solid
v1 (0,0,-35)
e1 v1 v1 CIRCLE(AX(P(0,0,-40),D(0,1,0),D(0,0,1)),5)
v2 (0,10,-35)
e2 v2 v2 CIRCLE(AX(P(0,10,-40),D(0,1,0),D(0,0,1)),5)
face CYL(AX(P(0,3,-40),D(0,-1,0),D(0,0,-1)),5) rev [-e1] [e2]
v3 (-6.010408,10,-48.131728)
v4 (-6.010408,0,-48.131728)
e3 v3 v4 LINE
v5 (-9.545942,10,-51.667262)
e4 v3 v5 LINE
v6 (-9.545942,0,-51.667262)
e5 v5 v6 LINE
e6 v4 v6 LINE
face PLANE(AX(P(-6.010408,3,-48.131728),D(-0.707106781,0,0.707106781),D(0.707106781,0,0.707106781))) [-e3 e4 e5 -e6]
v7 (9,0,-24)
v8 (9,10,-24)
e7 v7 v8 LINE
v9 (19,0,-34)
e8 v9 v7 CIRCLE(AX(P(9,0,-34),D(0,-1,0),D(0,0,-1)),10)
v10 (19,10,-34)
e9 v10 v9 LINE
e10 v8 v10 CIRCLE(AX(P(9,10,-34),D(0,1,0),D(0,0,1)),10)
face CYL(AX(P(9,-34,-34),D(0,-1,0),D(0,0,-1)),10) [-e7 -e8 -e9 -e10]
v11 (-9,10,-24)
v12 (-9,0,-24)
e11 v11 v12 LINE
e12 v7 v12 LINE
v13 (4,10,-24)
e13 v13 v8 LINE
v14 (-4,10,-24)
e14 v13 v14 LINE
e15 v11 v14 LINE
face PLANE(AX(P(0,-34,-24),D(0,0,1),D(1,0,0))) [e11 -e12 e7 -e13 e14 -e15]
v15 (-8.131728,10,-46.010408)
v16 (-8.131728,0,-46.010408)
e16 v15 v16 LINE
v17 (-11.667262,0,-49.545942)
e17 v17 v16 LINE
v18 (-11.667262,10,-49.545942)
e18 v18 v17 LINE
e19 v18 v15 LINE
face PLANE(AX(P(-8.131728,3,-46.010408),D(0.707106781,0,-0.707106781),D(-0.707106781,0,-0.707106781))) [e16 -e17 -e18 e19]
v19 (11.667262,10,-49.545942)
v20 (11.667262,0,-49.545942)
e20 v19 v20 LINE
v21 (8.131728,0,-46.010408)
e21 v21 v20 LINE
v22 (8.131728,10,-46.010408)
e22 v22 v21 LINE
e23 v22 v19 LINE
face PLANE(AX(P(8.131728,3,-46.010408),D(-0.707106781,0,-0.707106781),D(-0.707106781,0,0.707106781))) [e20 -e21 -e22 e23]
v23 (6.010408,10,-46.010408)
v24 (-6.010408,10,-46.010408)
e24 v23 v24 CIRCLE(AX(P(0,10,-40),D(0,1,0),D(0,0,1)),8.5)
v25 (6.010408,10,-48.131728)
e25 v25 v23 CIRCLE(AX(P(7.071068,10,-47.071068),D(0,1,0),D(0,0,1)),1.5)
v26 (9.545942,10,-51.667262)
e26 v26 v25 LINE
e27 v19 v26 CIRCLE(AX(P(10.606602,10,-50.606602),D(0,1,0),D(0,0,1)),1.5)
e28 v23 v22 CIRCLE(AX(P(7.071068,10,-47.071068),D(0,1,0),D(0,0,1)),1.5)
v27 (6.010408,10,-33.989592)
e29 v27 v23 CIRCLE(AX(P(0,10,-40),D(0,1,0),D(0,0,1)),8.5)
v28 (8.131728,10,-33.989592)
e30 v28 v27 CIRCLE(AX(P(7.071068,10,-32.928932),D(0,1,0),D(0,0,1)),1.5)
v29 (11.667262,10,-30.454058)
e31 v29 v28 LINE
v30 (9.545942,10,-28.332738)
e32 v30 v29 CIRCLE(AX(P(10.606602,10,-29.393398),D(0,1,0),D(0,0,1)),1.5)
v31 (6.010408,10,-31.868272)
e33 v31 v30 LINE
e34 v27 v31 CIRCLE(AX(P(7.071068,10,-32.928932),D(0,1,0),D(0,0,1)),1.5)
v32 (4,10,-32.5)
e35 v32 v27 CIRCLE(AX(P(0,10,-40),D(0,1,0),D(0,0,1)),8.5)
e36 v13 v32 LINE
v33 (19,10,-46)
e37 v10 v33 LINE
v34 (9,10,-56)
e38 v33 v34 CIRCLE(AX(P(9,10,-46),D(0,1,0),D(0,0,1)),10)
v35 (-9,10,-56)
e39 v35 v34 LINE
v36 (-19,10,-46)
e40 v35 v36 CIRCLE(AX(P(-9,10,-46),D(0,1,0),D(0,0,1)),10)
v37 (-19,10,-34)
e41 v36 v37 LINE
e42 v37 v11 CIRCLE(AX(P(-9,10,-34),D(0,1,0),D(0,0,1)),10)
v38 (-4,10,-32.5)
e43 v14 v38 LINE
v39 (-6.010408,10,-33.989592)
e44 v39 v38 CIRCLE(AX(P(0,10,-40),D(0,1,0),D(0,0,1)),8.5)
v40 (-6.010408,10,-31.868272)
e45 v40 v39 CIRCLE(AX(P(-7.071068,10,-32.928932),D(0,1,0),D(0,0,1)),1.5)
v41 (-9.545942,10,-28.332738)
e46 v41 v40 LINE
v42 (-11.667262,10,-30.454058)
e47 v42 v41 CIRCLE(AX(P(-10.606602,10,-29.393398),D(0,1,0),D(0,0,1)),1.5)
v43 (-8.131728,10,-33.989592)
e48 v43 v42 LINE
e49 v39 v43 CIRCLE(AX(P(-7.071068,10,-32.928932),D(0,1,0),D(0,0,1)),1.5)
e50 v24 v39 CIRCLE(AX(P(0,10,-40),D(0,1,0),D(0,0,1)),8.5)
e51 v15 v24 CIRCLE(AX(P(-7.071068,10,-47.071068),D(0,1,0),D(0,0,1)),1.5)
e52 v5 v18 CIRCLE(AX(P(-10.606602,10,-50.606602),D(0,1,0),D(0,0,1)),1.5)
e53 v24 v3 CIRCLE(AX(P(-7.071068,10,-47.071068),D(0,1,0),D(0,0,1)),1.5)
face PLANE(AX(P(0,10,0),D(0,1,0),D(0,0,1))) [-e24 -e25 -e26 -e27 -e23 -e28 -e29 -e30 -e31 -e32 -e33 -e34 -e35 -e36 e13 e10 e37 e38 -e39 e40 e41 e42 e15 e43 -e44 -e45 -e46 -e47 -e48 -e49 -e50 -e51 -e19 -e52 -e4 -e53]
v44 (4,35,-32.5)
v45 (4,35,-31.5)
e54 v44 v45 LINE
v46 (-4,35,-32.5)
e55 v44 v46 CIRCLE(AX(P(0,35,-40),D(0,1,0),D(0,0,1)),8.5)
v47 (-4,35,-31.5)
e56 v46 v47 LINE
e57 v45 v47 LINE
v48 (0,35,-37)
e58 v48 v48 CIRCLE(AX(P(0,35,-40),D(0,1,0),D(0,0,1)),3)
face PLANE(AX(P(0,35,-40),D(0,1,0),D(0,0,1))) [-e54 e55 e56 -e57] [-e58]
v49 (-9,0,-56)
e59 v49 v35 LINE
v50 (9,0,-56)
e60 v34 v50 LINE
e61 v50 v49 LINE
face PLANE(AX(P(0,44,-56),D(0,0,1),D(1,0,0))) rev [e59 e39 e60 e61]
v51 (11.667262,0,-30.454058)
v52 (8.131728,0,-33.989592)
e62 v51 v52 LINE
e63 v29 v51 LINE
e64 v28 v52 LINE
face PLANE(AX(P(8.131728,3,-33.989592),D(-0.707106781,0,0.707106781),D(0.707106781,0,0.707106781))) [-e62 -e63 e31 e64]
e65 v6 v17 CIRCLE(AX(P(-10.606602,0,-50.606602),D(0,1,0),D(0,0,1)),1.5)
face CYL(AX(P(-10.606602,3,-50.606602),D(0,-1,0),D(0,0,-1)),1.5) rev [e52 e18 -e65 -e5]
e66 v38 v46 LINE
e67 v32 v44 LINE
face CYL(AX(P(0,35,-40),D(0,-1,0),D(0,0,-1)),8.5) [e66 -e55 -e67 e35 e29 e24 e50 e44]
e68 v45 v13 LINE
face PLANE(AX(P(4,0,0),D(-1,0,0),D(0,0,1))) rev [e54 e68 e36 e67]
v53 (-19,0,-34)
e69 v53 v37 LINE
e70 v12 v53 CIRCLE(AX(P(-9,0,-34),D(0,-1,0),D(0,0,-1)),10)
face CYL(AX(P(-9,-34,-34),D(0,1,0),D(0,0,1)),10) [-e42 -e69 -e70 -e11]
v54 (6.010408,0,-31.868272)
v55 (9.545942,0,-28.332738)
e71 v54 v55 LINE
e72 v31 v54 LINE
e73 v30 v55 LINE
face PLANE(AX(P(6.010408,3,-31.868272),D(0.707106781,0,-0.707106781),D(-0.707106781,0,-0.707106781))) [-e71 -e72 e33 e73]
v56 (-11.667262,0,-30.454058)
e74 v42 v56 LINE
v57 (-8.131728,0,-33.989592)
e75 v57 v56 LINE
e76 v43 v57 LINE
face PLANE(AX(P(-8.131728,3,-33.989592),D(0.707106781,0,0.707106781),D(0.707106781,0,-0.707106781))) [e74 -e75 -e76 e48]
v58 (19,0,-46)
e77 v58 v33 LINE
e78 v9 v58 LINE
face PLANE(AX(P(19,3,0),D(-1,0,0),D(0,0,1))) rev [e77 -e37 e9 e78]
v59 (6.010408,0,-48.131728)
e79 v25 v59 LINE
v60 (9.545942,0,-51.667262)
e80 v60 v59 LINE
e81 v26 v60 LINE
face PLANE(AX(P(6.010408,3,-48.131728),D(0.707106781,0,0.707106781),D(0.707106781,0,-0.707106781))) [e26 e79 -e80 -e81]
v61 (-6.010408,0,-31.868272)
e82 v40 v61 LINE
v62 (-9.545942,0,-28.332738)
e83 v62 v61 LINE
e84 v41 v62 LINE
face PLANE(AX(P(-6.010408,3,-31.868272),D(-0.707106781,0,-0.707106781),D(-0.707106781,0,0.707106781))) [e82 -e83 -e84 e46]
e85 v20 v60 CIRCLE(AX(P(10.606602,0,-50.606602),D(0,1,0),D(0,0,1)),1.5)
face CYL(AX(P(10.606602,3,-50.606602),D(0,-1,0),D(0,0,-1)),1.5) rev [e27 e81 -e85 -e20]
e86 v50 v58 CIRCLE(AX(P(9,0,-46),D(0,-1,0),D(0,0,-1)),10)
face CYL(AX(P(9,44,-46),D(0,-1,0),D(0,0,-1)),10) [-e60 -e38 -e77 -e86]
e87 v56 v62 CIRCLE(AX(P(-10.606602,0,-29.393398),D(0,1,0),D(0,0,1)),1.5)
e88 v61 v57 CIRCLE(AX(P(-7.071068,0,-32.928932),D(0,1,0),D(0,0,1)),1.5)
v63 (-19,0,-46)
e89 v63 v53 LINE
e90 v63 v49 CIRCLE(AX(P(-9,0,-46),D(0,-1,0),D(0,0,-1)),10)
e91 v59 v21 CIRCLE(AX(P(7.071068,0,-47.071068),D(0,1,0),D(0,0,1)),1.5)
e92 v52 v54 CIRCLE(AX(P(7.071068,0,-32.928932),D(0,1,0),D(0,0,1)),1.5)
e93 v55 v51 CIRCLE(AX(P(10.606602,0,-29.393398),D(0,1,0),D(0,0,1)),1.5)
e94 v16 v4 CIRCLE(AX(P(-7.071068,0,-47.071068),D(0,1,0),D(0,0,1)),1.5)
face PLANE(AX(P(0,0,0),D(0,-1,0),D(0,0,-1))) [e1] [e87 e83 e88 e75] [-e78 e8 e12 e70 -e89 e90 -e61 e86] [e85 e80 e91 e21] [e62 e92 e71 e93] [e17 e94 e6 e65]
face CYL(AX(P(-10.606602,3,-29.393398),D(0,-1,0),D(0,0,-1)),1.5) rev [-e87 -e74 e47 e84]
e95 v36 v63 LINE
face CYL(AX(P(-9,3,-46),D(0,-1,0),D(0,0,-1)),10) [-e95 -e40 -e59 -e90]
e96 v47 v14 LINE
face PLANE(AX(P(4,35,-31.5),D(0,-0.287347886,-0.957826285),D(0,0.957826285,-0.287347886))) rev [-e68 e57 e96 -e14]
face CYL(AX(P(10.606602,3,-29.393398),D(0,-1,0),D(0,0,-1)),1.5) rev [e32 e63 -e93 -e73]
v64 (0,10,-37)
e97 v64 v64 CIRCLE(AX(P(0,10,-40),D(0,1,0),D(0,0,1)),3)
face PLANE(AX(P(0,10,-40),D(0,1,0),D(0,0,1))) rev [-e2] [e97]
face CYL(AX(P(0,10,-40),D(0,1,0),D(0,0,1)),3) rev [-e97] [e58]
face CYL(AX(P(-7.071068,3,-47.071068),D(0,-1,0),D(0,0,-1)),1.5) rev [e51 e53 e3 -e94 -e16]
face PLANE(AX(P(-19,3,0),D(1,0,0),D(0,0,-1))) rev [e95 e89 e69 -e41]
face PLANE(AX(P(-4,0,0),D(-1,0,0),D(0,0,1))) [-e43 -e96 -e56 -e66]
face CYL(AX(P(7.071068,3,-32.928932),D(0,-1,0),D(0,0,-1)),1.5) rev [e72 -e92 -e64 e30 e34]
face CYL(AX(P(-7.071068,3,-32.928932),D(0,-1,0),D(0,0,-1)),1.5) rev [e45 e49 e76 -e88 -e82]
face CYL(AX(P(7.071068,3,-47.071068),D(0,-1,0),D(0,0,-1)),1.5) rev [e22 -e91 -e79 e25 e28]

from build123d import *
from build123d.topology import SkipClean

# Parameters (mm, degrees)
SKETCH_1_R          = 5
SKETCH_1_R_2        = 1.5
EXTRUDE_2_DEPTH     = 3
CUT_EXTRUDE_START   = -37
SKETCH_2_R          = 1.5
CUT_EXTRUDE_1_DEPTH = 37
SKETCH_3_W          = 38
SKETCH_3_H          = 6.73766493
EXTRUDE_3_DEPTH     = 3
SKETCH_5_W          = 53.60328953
SKETCH_5_H          = 19.816992683
CUT_EXTRUDE_2_DEPTH = 3
SKETCH_6_W          = 38
SKETCH_6_H          = 40
EXTRUDE_5_DEPTH     = 7
SKETCH_8_W          = 38
SKETCH_8_H          = 8
CUT_EXTRUDE_4_DEPTH = 44
SKETCH_9_R          = 5
CUT_EXTRUDE_5_DEPTH = 44
CUT_EXTRUDE_6_DEPTH = 44
SKETCH_13_R         = 8.5
EXTRUDE_6_DEPTH     = 25
SKETCH_14_R         = 3
CUT_EXTRUDE_7_DEPTH = 25
EXTRUDE_7_DEPTH     = 4
FILLET_1_R          = 10


with BuildPart() as part:
    # 草图1 → 凸台-拉伸2 (new body)
    with BuildSketch(Plane(origin=(0, 0, 0), x_dir=(1, 0, 0), z_dir=(0, 1, 0))):
        with BuildLine():
            Line((0, 0), (19, 0))
            Line((19, 0), (19, 64))
            ThreePointArc((19, 64), (0, 66.760766922), (-19, 64))
            Line((-19, 64), (-19, 0))
            Line((-19, 0), (0, 0))
        make_face()
        with Locations((0, 40)):
            Circle(SKETCH_1_R, mode=Mode.SUBTRACT)
        with Locations((-16.171572875, 2.828427125)):
            Circle(SKETCH_1_R_2, mode=Mode.SUBTRACT)
        with Locations((-16.171572875, 61.171572875)):
            Circle(SKETCH_1_R_2, mode=Mode.SUBTRACT)
        with Locations((16.171572875, 61.171572875)):
            Circle(SKETCH_1_R_2, mode=Mode.SUBTRACT)
        with Locations((16.171572875, 2.828427125)):
            Circle(SKETCH_1_R_2, mode=Mode.SUBTRACT)
        with BuildLine():
            Line((10.606601718, 19.929208429), (10.606601718, 16.885025549))
            ThreePointArc((10.606601718, 16.885025549), (0, 16), (-10.606601718, 16.885025549))
            Line((-10.606601718, 16.885025549), (-10.606601718, 19.929208429))
            ThreePointArc((-10.606601718, 19.929208429), (0, 19), (10.606601718, 19.929208429))
        make_face(mode=Mode.SUBTRACT)
        with BuildLine():
            Line((-8.131727984, 46.01040764), (-11.66726189, 49.545941546))
            ThreePointArc((-11.66726189, 49.545941546), (-11.66726189, 51.66726189), (-9.545941546, 51.66726189))
            Line((-9.545941546, 51.66726189), (-6.01040764, 48.131727984))
            ThreePointArc((-6.01040764, 48.131727984), (-6.01040764, 46.01040764), (-8.131727984, 46.01040764))
        make_face(mode=Mode.SUBTRACT)
        with BuildLine():
            Line((6.01040764, 48.131727984), (9.545941546, 51.66726189))
            ThreePointArc((9.545941546, 51.66726189), (11.66726189, 51.66726189), (11.66726189, 49.545941546))
            Line((11.66726189, 49.545941546), (8.131727984, 46.01040764))
            ThreePointArc((8.131727984, 46.01040764), (6.01040764, 46.01040764), (6.01040764, 48.131727984))
        make_face(mode=Mode.SUBTRACT)
        with BuildLine():
            Line((8.131727984, 33.98959236), (11.66726189, 30.454058454))
            ThreePointArc((11.66726189, 30.454058454), (11.66726189, 28.33273811), (9.545941546, 28.33273811))
            Line((9.545941546, 28.33273811), (6.01040764, 31.868272016))
            ThreePointArc((6.01040764, 31.868272016), (6.01040764, 33.98959236), (8.131727984, 33.98959236))
        make_face(mode=Mode.SUBTRACT)
        with BuildLine():
            Line((-6.01040764, 31.868272016), (-9.545941546, 28.33273811))
            ThreePointArc((-9.545941546, 28.33273811), (-11.66726189, 28.33273811), (-11.66726189, 30.454058454))
            Line((-11.66726189, 30.454058454), (-8.131727984, 33.98959236))
            ThreePointArc((-8.131727984, 33.98959236), (-6.01040764, 33.98959236), (-6.01040764, 31.868272016))
        make_face(mode=Mode.SUBTRACT)
        with BuildLine():
            Line((-10.606601718, 60.070791571), (-10.606601718, 63.114974451))
            ThreePointArc((-10.606601718, 63.114974451), (0, 64), (10.606601718, 63.114974451))
            Line((10.606601718, 63.114974451), (10.606601718, 60.070791571))
            ThreePointArc((10.606601718, 60.070791571), (0, 61), (-10.606601718, 60.070791571))
        make_face(mode=Mode.SUBTRACT)
    extrude(amount=EXTRUDE_2_DEPTH)

    # 草图2 → 切除-拉伸1 (cut)
    with BuildSketch(Plane(origin=(0, 3, 0), x_dir=(1, 0, 0), z_dir=(0, 1, 0)).offset(CUT_EXTRUDE_START)):
        Polygon((0, 24), (-19, 24), (-19, 0), (19, 0), (19, 24), align=None)
        with Locations((-16.171572875, 2.828427125)):
            Circle(SKETCH_2_R, mode=Mode.SUBTRACT)
        with Locations((16.171572875, 2.828427125)):
            Circle(SKETCH_2_R, mode=Mode.SUBTRACT)
        with BuildLine():
            Line((-10.606601718, 16.885025549), (-10.606601718, 19.929208429))
            ThreePointArc((-10.606601718, 19.929208429), (0, 19), (10.606601718, 19.929208429))
            Line((10.606601718, 19.929208429), (10.606601718, 16.885025549))
            ThreePointArc((10.606601718, 16.885025549), (0, 16), (-10.606601718, 16.885025549))
        make_face(mode=Mode.SUBTRACT)
    extrude(amount=CUT_EXTRUDE_1_DEPTH, mode=Mode.SUBTRACT)

    # 草图3 → 凸台-拉伸3 (add)
    with BuildSketch(Plane.XZ):
        with Locations((0, -60.631167535)):
            Rectangle(SKETCH_3_W, SKETCH_3_H)
    extrude(amount=-EXTRUDE_3_DEPTH)

    # 草图5 → 切除-拉伸2 (cut)
    with BuildSketch(Plane(origin=(0, 3, 0), x_dir=(1, 0, 0), z_dir=(0, 1, 0))):
        with Locations((7.801644765, 73.908496342)):
            Rectangle(SKETCH_5_W, SKETCH_5_H)
    extrude(amount=-CUT_EXTRUDE_2_DEPTH, mode=Mode.SUBTRACT)

    # 草图6 → 凸台-拉伸5 (add)
    with BuildSketch(Plane(origin=(0, 3, 0), x_dir=(1, 0, 0), z_dir=(0, 1, 0))):
        with Locations((0, 44)):
            Rectangle(SKETCH_6_W, SKETCH_6_H)
    extrude(amount=EXTRUDE_5_DEPTH)

    # 草图8 → 切除-拉伸4 (cut)
    with BuildSketch(Plane(origin=(0, 0, 0), x_dir=(-1, 0, 0), z_dir=(0, -1, 0))):
        with Locations((0, 60)):
            Rectangle(SKETCH_8_W, SKETCH_8_H)
    extrude(amount=-CUT_EXTRUDE_4_DEPTH, mode=Mode.SUBTRACT)

    # 草图9 → 切除-拉伸5 (cut)
    with BuildSketch(Plane.XZ):
        with Locations((0, -40)):
            Circle(SKETCH_9_R)
    extrude(amount=-CUT_EXTRUDE_5_DEPTH, mode=Mode.SUBTRACT)

    # 草图11 → 切除-拉伸6 (cut)
    with BuildSketch(Plane.XZ):
        with BuildLine():
            Line((11.66726189, -30.454058454), (8.131727984, -33.98959236))
            ThreePointArc((8.131727984, -33.98959236), (6.01040764, -33.98959236), (6.01040764, -31.868272016))
            Line((6.01040764, -31.868272016), (9.545941546, -28.33273811))
            ThreePointArc((9.545941546, -28.33273811), (11.66726189, -28.33273811), (11.66726189, -30.454058454))
        make_face()
        with BuildLine():
            Line((9.545941546, -51.66726189), (6.01040764, -48.131727984))
            ThreePointArc((6.01040764, -48.131727984), (6.01040764, -46.01040764), (8.131727984, -46.01040764))
            Line((8.131727984, -46.01040764), (11.66726189, -49.545941546))
            ThreePointArc((11.66726189, -49.545941546), (11.66726189, -51.66726189), (9.545941546, -51.66726189))
        make_face()
        with BuildLine():
            Line((-11.66726189, -49.545941546), (-8.131727984, -46.01040764))
            ThreePointArc((-8.131727984, -46.01040764), (-6.01040764, -46.01040764), (-6.01040764, -48.131727984))
            Line((-6.01040764, -48.131727984), (-9.545941546, -51.66726189))
            ThreePointArc((-9.545941546, -51.66726189), (-11.66726189, -51.66726189), (-11.66726189, -49.545941546))
        make_face()
        with BuildLine():
            Line((-9.545941546, -28.33273811), (-6.01040764, -31.868272016))
            ThreePointArc((-6.01040764, -31.868272016), (-6.01040764, -33.98959236), (-8.131727984, -33.98959236))
            Line((-8.131727984, -33.98959236), (-11.66726189, -30.454058454))
            ThreePointArc((-11.66726189, -30.454058454), (-11.66726189, -28.33273811), (-9.545941546, -28.33273811))
        make_face()
    extrude(amount=-CUT_EXTRUDE_6_DEPTH, mode=Mode.SUBTRACT)

    # 草图13 → 凸台-拉伸6 (add)
    with SkipClean():  # the faces are left unmerged after this step: merging them gives an invalid solid
        with BuildSketch(Plane(origin=(0, 10, 0), x_dir=(1, 0, 0), z_dir=(0, 1, 0))):
            with Locations((0, 40)):
                Circle(SKETCH_13_R)
        extrude(amount=EXTRUDE_6_DEPTH)
    add(part.part.scale(1), mode=Mode.REPLACE)  # the faces are merged on a copy

    # 草图14 → 切除-拉伸7 (cut)
    with BuildSketch(Plane(origin=(0, 35, 0), x_dir=(1, 0, 0), z_dir=(0, 1, 0))):
        with Locations((0, 40)):
            Circle(SKETCH_14_R)
    extrude(amount=-CUT_EXTRUDE_7_DEPTH, mode=Mode.SUBTRACT)

    # 草图15 → 凸台-拉伸7 (add, symmetric)
    with BuildSketch(Plane(origin=(0, 0, 0), x_dir=(0, 0, -1), z_dir=(1, 0, 0))):
        Polygon((31.5, 35), (24, 10), (31.5, 10), (32.928568569, 10), (32.928568569, 35), align=None)
    extrude(amount=EXTRUDE_7_DEPTH, both=True)

    # 圆角1
    fillet_1_edges = [part.edges().sort_by_distance(p)[0] for p in [
        (19, 5, -24),
        (-19, 5, -24),
        (19, 5, -56),
        (-19, 5, -56),
    ]]
    fillet(fillet_1_edges, radius=FILLET_1_R)


solid = part.part
